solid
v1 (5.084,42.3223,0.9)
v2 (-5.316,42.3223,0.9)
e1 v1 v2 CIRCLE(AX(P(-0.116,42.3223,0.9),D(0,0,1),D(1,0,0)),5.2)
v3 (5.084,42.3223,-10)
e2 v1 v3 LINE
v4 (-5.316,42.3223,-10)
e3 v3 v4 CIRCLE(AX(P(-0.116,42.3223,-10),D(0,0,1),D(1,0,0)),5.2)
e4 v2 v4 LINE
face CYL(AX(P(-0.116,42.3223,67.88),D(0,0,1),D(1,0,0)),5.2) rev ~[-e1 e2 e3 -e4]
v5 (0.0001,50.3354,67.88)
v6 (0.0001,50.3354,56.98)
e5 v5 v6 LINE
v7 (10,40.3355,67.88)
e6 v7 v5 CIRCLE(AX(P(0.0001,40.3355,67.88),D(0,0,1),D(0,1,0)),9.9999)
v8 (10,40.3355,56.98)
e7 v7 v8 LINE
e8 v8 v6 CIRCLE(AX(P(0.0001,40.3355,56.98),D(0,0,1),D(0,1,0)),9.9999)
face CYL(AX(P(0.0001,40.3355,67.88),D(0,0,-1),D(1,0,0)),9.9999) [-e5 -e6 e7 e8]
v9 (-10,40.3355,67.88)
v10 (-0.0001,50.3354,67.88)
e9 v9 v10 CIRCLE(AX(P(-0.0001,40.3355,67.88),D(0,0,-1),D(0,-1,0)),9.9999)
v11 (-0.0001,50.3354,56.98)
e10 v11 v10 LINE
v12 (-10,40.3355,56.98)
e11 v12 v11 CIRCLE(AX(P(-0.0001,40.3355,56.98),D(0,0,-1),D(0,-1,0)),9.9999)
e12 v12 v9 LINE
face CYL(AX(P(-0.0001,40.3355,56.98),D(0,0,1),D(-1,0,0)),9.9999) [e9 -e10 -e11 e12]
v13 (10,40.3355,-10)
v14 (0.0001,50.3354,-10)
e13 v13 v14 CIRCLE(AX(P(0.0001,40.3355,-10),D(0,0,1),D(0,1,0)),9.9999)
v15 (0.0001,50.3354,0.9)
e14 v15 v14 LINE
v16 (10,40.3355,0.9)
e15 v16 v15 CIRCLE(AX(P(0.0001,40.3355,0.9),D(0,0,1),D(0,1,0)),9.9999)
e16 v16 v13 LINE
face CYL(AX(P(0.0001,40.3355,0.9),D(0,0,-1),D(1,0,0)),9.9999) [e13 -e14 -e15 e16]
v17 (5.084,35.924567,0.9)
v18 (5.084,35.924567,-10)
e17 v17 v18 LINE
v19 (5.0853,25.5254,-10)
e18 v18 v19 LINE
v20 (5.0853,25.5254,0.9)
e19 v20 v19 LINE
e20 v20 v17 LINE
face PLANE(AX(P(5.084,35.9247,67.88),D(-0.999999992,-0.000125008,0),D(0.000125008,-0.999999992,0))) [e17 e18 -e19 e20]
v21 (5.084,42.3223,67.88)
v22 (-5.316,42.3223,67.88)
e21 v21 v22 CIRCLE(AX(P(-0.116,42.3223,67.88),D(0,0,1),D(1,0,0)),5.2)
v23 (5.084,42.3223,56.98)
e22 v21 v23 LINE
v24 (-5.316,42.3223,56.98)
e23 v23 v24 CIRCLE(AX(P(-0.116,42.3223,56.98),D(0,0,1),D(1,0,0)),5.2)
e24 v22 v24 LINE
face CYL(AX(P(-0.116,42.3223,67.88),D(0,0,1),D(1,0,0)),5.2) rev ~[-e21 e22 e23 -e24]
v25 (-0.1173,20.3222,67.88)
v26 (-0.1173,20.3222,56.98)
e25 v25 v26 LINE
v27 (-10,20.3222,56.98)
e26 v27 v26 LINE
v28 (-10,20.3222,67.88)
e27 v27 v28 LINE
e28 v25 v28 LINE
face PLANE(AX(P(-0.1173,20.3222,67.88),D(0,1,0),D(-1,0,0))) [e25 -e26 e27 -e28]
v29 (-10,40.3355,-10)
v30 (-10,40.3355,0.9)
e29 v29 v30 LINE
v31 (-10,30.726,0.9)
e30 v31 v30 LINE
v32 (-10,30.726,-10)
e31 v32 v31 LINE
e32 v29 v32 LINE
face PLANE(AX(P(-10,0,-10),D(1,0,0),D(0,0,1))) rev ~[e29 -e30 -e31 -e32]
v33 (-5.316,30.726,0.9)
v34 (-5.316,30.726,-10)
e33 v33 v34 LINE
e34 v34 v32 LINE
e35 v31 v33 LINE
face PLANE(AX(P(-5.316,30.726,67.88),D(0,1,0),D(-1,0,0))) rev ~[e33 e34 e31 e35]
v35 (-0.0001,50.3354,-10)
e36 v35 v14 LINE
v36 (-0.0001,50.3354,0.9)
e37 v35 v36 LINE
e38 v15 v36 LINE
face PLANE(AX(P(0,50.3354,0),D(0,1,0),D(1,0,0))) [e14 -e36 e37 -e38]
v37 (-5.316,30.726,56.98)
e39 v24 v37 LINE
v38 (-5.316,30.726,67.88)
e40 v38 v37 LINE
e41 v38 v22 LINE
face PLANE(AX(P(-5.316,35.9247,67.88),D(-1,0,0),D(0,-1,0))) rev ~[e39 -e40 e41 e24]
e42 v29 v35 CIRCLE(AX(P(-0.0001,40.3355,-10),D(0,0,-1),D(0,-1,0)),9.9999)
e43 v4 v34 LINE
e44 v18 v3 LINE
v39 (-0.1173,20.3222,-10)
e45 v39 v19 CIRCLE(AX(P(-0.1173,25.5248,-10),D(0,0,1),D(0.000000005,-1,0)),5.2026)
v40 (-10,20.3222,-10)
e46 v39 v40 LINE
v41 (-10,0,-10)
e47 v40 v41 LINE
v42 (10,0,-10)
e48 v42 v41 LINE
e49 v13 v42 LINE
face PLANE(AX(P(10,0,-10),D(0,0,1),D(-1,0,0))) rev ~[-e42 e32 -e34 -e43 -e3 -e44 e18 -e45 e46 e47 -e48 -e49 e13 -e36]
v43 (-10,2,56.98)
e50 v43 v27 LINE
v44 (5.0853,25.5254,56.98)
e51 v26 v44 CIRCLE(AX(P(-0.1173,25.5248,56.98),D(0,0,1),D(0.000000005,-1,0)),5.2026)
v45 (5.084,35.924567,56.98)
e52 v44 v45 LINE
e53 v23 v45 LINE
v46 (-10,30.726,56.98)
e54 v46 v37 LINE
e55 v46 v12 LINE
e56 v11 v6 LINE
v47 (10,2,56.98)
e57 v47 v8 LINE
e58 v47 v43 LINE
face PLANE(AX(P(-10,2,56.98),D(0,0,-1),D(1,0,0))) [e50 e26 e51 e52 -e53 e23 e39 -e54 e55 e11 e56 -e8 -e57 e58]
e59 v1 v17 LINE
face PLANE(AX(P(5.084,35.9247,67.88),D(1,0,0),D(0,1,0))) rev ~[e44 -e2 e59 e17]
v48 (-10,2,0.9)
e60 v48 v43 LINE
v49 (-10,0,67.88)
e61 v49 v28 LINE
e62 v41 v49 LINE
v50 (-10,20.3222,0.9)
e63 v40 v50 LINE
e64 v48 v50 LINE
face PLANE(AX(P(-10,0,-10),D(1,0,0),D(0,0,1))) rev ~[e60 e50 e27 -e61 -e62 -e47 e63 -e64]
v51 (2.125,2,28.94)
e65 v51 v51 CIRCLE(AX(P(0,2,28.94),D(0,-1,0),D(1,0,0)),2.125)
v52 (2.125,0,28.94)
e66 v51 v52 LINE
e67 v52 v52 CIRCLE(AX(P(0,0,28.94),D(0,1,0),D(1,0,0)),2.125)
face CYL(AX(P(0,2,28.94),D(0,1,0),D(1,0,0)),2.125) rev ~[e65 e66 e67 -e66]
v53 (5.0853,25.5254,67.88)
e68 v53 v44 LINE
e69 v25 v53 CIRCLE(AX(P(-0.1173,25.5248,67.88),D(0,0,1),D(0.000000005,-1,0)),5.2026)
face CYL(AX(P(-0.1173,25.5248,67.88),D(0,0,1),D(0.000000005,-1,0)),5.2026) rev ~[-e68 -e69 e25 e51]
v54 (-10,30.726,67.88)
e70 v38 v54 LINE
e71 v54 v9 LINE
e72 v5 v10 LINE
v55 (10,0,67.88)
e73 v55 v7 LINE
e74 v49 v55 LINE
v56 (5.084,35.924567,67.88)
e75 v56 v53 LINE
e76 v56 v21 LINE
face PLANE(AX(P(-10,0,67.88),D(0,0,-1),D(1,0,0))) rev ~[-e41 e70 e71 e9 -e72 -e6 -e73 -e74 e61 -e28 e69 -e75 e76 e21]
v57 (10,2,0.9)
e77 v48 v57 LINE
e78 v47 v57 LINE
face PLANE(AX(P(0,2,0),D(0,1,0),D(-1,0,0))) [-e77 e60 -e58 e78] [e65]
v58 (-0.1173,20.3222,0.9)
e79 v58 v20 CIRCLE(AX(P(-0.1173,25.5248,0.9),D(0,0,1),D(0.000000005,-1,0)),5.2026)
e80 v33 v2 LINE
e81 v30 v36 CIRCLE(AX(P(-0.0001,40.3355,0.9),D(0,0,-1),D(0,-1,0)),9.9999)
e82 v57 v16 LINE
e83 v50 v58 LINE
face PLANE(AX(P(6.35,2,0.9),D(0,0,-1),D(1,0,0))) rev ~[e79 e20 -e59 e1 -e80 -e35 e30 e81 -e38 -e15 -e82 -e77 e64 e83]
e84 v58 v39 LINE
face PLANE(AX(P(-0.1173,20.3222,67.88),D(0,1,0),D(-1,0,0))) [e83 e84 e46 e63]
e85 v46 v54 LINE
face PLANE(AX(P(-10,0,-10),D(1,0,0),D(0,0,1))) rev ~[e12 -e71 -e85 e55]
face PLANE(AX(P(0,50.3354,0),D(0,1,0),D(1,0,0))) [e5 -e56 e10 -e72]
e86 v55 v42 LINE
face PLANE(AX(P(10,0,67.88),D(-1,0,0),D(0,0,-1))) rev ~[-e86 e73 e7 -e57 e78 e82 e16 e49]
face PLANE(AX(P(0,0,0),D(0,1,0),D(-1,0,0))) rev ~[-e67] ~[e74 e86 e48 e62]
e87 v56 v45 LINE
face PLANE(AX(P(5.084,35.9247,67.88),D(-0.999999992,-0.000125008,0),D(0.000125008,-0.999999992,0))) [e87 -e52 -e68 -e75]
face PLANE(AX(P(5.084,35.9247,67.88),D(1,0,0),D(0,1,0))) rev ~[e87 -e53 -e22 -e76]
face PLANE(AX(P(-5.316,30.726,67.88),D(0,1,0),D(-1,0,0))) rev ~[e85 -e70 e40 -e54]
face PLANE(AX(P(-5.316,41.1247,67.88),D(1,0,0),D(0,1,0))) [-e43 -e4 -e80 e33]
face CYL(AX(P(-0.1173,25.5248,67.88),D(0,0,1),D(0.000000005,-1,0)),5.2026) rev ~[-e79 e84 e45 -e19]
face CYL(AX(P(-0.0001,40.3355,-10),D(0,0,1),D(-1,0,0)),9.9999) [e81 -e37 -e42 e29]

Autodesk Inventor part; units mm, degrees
ref_plane "YZ Plane" through (0, 0, 0) normal (1, 0, 0) x (0, 1, 0)
ref_plane "XZ Plane" through (0, 0, 0) normal (0, 1, 0) x (-1, 0, 0)
ref_plane "XY Plane" through (0, 0, 0) normal (0, 0, 1) x (1, 0, 0)
sketch "Sketch1" plane through (0, 0, 0) normal (0, 1, 0) x (-1, 0, 0)
  line L0 (10, 67.88) -> (-10, 67.88)
  line L1 (-10, 67.88) -> (-10, -10)
  line L2 (-10, -10) -> (10, -10)
  line L3 (10, -10) -> (10, 67.88)
  point P0 (0, 0)
  dimension "d0" = 20
  dimension "d1" = 77.88
extrude "Extrusion1" add sketch "Sketch1" along normal blind 2
sketch "Sketch2" plane through (0, 2, 0) normal (0, 1, 0) x (1, 0, 0)
  line L0 (-10, -67.88) -> (10, -67.88) projected
  line L1 (0, -67.88) -> (-6.35, -67.88)
  line L2 (-6.35, -56.98) -> (6.35, -56.98)
  line L3 (6.35, -67.88) -> (0, -67.88)
  line L4 (10, 10) -> (-10, 10) projected
  line L5 (-6.35, -0.9) -> (6.35, -0.9)
  line L6 (-6.35, 10) -> (6.35, 10)
  line L7 (-6.35, -67.88) -> (-10, -67.88)
  line L8 (-10, 10) -> (-10, -67.88) projected
  line L9 (-10, -56.98) -> (-6.35, -56.98)
  line L10 (6.35, -67.88) -> (10, -67.88)
  line L11 (10, -67.88) -> (10, 10) projected
  line L12 (10, -56.98) -> (6.35, -56.98)
  line L13 (6.35, -0.9) -> (10, -0.9)
  line L14 (10, 10) -> (6.35, 10)
  line L15 (10, -0.9) -> (10, 10)
  line L16 (10, -67.88) -> (10, -56.98)
  line L17 (-10, -67.88) -> (-10, -56.98)
  line L18 (-6.35, -0.9) -> (-10, -0.9)
  line L19 (-10, -0.9) -> (-10, 10)
  line L20 (-10, 10) -> (-6.35, 10)
  point P0 (0, 0)
  dimension "d4" = 6.35
  dimension "d5" = 10.9
  dimension "d6" = 12.7
  dimension "d7" = 10.9
extrude "Extrusion2" add sketch "Sketch2" along normal blind 48.3354 contours L8 L9 L2 L12 L11 L0 | L8 L4 L11 L13 L5 L18
sketch "Sketch9" plane through (-10, 0, 67.88) normal (0, 0, 1) x (1, 0, 0)
  arc A0 (15.084, 42.3223) -> (4.684, 42.3223) centre (9.884, 42.3223) ccw
  line L0 (15.084, 35.9247) -> (15.084, 42.3223)
  line L1 (4.684, 41.1247) -> (4.684, 42.3223)
  arc A1 (15.084, 42.3223) -> (4.684, 42.3223) centre (9.884, 42.3223) ccw
  line L2 (4.684, 42.3223) -> (4.684, 35.9247)
  line L3 (9.8827, 20.3222) -> (-0.0013, 20.3222)
  line L4 (-0.0013, 30.726) -> (-0.0013, 20.3222)
  line L5 (4.684, 35.9247) -> (4.684, 30.726)
  line L6 (15.084, 35.9247) -> (15.0853, 25.5254)
  arc A2 (15.084, 35.9247) -> (15.084, 35.9251) centre (9.884, 35.9243) ccw
  line L7 (4.684, 30.726) -> (-0.0013, 30.726)
  arc A3 (9.8827, 20.3222) -> (15.0853, 25.5254) centre (9.8827, 25.5248) ccw
  point P0 (10, 0)
fillet "Fillet4" radius 10 4 edges at (10, 50.3354, 62.43) (-10, 50.3354, 62.43) (-10, 50.3354, -4.55) (10, 50.3354, -4.55)
sketch "Sketch10" plane through (0, 2, 0) normal (0, 1, 0) x (1, 0, 0)
  line L0 (10, -67.88) -> (-10, -67.88) projected
  line L1 (-10, 10) -> (10, 10) projected
  line L2 (10, -56.98) -> (10, -0.9) projected
  line L3 (-10, -0.9) -> (-10, -56.98) projected
  line L4 (10, -28.94) -> (-10, -28.94)
  circle A0 centre (0, -28.94) radius 2.125
  point P0 (0, 0)
  dimension "d53" = 77.88
  dimension "d54" = 4.25
extrude "Extrusion10" cut sketch "Sketch10" against normal blind 2
extrude "Extrusion11" cut sketch "Sketch9" against normal through all
properties part number "6 Backet Adjustment"
